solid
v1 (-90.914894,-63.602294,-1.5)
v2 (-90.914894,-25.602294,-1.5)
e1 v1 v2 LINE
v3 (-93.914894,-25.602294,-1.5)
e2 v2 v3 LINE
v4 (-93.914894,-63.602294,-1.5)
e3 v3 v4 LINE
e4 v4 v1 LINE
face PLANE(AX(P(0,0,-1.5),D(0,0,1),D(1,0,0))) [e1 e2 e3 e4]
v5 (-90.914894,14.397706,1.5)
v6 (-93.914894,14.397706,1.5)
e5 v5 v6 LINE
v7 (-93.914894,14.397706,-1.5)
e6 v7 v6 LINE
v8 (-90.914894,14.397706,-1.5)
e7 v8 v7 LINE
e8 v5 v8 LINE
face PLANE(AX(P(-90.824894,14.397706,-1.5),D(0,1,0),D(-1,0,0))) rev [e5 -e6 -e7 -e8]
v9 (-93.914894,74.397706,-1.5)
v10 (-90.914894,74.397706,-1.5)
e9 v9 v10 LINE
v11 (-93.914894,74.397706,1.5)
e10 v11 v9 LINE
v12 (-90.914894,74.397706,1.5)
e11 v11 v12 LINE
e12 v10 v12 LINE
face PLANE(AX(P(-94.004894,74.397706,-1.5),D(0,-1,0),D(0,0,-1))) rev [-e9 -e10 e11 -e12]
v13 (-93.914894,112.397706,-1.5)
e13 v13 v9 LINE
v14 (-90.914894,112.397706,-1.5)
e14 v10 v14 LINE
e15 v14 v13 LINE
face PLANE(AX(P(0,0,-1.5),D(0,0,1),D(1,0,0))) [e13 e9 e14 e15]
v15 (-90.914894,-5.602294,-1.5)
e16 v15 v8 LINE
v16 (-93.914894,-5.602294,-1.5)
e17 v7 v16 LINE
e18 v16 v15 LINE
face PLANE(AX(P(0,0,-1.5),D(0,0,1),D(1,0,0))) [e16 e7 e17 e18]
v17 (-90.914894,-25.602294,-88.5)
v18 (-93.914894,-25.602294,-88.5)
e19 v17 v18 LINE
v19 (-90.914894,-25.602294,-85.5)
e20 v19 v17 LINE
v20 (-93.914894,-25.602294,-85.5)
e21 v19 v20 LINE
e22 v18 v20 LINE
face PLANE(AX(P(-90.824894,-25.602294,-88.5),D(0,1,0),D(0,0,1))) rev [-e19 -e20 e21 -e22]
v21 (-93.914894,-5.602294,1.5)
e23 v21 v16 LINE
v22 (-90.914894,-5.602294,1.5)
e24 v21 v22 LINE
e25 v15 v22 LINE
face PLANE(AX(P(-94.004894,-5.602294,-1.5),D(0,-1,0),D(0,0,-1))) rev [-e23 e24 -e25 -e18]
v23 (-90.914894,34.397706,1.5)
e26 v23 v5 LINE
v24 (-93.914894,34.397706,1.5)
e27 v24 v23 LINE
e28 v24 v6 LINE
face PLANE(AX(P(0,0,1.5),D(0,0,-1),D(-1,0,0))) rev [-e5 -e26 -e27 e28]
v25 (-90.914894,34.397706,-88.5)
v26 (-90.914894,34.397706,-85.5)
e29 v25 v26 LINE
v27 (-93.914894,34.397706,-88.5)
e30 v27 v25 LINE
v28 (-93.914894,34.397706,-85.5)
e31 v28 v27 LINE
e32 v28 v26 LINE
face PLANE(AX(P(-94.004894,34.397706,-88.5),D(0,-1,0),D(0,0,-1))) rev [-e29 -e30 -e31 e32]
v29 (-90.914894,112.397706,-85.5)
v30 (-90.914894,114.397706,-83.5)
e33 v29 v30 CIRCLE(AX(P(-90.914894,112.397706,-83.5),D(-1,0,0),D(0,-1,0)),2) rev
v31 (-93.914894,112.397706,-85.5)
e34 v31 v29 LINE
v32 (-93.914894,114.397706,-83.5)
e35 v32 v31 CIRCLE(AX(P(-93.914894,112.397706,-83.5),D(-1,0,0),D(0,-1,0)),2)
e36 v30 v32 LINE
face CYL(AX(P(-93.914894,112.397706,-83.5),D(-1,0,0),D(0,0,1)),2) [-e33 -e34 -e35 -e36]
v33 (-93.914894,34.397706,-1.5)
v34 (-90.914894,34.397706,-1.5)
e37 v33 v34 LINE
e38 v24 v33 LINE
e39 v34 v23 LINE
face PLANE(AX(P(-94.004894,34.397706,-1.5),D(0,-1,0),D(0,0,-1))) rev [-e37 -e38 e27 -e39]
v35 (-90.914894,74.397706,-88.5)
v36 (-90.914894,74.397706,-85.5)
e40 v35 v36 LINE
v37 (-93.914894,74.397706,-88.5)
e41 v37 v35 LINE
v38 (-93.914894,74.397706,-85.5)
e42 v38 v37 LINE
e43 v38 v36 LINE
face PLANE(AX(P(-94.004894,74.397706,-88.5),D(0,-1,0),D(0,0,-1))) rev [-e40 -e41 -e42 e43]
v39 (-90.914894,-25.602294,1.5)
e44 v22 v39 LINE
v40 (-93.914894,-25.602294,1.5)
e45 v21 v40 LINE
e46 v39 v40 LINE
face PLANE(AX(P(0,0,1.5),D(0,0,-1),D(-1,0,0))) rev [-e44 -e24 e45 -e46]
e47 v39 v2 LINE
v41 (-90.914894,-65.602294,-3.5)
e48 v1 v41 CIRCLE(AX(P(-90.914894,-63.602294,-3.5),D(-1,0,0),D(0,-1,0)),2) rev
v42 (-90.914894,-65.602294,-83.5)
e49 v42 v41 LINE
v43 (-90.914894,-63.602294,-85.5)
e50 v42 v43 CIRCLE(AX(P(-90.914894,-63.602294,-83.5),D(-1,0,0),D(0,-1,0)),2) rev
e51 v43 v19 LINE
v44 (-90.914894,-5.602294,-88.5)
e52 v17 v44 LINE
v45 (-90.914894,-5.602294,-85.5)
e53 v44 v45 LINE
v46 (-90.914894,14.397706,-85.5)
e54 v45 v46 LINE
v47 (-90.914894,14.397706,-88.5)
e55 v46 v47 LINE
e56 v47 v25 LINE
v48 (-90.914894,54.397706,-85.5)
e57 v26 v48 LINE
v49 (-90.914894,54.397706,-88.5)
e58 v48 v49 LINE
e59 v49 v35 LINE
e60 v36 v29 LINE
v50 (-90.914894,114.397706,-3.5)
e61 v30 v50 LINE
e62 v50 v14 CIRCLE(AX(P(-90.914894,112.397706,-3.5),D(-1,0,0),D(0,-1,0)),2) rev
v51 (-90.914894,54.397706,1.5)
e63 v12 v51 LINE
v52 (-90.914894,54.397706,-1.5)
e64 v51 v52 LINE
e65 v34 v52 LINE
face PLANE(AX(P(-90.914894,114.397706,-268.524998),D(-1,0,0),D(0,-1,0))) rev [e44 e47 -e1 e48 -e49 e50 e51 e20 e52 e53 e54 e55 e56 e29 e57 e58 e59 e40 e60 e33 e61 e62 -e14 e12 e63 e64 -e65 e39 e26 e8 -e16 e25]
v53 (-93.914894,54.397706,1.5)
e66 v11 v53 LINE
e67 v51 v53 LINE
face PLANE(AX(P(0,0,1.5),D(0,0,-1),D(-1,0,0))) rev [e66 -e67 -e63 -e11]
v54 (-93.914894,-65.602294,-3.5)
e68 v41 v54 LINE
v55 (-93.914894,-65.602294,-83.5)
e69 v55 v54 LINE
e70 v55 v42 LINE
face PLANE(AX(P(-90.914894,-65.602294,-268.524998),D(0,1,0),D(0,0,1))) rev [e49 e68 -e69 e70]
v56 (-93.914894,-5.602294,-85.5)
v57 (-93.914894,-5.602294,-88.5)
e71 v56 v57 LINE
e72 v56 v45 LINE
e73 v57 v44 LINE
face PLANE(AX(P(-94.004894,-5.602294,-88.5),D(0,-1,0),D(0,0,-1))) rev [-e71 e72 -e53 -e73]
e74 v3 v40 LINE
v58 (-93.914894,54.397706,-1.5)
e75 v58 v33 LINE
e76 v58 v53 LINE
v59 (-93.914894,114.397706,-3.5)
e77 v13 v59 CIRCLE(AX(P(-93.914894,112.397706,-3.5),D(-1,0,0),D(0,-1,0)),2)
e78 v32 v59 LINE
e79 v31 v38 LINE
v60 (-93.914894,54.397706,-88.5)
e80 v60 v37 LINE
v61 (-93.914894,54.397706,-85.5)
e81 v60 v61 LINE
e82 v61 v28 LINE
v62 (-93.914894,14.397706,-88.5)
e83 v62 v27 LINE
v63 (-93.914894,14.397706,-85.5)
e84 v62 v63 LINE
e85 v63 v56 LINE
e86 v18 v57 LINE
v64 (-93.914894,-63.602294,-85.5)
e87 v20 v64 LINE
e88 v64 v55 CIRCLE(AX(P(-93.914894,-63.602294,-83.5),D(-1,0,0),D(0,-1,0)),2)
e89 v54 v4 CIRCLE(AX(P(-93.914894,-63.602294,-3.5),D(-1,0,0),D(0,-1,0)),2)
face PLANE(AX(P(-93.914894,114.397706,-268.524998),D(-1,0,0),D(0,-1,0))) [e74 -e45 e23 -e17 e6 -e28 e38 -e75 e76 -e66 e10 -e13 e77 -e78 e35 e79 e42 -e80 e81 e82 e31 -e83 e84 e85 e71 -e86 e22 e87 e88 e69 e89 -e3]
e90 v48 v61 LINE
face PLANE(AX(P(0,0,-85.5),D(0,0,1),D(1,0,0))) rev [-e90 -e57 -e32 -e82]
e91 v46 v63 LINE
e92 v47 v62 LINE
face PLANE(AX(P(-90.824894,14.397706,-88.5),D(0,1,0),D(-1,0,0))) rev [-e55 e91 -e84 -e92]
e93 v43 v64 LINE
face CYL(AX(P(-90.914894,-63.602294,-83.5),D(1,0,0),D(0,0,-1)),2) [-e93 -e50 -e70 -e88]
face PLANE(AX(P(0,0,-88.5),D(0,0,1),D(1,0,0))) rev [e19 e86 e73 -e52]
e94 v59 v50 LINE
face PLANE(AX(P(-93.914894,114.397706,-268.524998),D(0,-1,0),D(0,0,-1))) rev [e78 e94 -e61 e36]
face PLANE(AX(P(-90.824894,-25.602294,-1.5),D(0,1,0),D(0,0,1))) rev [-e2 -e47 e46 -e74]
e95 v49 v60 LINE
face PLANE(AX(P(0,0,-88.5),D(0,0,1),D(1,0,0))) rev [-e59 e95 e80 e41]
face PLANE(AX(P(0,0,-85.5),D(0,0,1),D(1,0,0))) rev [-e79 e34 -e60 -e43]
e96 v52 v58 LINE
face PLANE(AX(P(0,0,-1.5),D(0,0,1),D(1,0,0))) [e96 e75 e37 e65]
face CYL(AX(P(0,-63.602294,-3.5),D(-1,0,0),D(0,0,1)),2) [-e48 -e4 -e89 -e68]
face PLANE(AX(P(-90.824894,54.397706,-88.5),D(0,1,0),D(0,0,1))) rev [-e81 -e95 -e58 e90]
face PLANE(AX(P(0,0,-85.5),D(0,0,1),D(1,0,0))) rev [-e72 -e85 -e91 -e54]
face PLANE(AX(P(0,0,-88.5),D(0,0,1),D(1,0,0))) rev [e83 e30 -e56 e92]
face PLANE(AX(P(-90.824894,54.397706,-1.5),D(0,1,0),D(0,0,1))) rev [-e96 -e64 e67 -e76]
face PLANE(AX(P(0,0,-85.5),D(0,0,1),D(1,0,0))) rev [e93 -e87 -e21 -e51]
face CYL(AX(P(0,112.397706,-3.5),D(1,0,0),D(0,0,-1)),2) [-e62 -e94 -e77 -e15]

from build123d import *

# Parameters (mm, degrees)
SKETCH1_W           = 3
SKETCH1_H           = 180
EXTRUDE_THIN1_DEPTH = 90
CAVITY1_START       = -65.602294015
CAVITY1_OUTLINE_W   = 3
CAVITY1_OUTLINE_H   = 3
CAVITY1_DEPTH       = 40
CAVITY1_START_2     = 74.397705985
CAVITY1_2_OUTLINE_W = 3
CAVITY1_2_OUTLINE_H = 3
CAVITY1_2_DEPTH     = 40
CAVITY1_START_3     = -5.602294015
CAVITY1_3_OUTLINE_W = 3
CAVITY1_3_OUTLINE_H = 3
CAVITY1_3_DEPTH     = 20
CAVITY1_START_4     = 34.397705985
CAVITY1_4_OUTLINE_W = 3
CAVITY1_4_OUTLINE_H = 3
CAVITY1_4_DEPTH     = 20
FILLET1_R           = 2


# Read off the part's stored shape, not the designer's step: Cavity1
with BuildPart() as part:
    # Sketch1 → Extrude-Thin1 (new body)
    with BuildSketch(Plane.XY.offset(1.5)):
        with Locations((-92.414893617, 24.397705985)):
            Rectangle(SKETCH1_W, SKETCH1_H)
    extrude(amount=-EXTRUDE_THIN1_DEPTH)

    # Cavity1 outline → Cavity1 (cut)
    with BuildSketch(Plane(origin=(0, 0, 0), x_dir=(1, 0, 0), z_dir=(0, 1, 0)).offset(CAVITY1_START)):
        with Locations((-92.414893617, 87)):
            Rectangle(CAVITY1_OUTLINE_W, CAVITY1_OUTLINE_H)
        with Locations((-92.414893617, 0)):
            Rectangle(CAVITY1_OUTLINE_W, CAVITY1_OUTLINE_H)
    extrude(amount=CAVITY1_DEPTH, mode=Mode.SUBTRACT)

    # Cavity1 2 outline → Cavity1 2 (cut)
    with BuildSketch(Plane(origin=(0, 0, 0), x_dir=(1, 0, 0), z_dir=(0, 1, 0)).offset(CAVITY1_START_2)):
        with Locations((-92.414893617, 87)):
            Rectangle(CAVITY1_2_OUTLINE_W, CAVITY1_2_OUTLINE_H)
        with Locations((-92.414893617, 0)):
            Rectangle(CAVITY1_2_OUTLINE_W, CAVITY1_2_OUTLINE_H)
    extrude(amount=CAVITY1_2_DEPTH, mode=Mode.SUBTRACT)

    # Cavity1 3 outline → Cavity1 3 (cut)
    with BuildSketch(Plane(origin=(0, 0, 0), x_dir=(1, 0, 0), z_dir=(0, 1, 0)).offset(CAVITY1_START_3)):
        with Locations((-92.414893617, 87)):
            Rectangle(CAVITY1_3_OUTLINE_W, CAVITY1_3_OUTLINE_H)
        with Locations((-92.414893617, 0)):
            Rectangle(CAVITY1_3_OUTLINE_W, CAVITY1_3_OUTLINE_H)
    extrude(amount=CAVITY1_3_DEPTH, mode=Mode.SUBTRACT)

    # Cavity1 4 outline → Cavity1 4 (cut)
    with BuildSketch(Plane(origin=(0, 0, 0), x_dir=(1, 0, 0), z_dir=(0, 1, 0)).offset(CAVITY1_START_4)):
        with Locations((-92.414893617, 87)):
            Rectangle(CAVITY1_4_OUTLINE_W, CAVITY1_4_OUTLINE_H)
        with Locations((-92.414893617, 0)):
            Rectangle(CAVITY1_4_OUTLINE_W, CAVITY1_4_OUTLINE_H)
    extrude(amount=CAVITY1_4_DEPTH, mode=Mode.SUBTRACT)

    # Fillet1
    fillet1_edges = [part.edges().sort_by_distance(p)[0] for p in [
        (-92.414893617, -65.602294015, -85.5),
        (-92.414893617, 114.397705985, -85.5),
        (-92.414893617, 114.397705985, -1.5),
        (-92.414893617, -65.602294015, -1.5),
    ]]
    fillet(fillet1_edges, radius=FILLET1_R)


solid = part.part
